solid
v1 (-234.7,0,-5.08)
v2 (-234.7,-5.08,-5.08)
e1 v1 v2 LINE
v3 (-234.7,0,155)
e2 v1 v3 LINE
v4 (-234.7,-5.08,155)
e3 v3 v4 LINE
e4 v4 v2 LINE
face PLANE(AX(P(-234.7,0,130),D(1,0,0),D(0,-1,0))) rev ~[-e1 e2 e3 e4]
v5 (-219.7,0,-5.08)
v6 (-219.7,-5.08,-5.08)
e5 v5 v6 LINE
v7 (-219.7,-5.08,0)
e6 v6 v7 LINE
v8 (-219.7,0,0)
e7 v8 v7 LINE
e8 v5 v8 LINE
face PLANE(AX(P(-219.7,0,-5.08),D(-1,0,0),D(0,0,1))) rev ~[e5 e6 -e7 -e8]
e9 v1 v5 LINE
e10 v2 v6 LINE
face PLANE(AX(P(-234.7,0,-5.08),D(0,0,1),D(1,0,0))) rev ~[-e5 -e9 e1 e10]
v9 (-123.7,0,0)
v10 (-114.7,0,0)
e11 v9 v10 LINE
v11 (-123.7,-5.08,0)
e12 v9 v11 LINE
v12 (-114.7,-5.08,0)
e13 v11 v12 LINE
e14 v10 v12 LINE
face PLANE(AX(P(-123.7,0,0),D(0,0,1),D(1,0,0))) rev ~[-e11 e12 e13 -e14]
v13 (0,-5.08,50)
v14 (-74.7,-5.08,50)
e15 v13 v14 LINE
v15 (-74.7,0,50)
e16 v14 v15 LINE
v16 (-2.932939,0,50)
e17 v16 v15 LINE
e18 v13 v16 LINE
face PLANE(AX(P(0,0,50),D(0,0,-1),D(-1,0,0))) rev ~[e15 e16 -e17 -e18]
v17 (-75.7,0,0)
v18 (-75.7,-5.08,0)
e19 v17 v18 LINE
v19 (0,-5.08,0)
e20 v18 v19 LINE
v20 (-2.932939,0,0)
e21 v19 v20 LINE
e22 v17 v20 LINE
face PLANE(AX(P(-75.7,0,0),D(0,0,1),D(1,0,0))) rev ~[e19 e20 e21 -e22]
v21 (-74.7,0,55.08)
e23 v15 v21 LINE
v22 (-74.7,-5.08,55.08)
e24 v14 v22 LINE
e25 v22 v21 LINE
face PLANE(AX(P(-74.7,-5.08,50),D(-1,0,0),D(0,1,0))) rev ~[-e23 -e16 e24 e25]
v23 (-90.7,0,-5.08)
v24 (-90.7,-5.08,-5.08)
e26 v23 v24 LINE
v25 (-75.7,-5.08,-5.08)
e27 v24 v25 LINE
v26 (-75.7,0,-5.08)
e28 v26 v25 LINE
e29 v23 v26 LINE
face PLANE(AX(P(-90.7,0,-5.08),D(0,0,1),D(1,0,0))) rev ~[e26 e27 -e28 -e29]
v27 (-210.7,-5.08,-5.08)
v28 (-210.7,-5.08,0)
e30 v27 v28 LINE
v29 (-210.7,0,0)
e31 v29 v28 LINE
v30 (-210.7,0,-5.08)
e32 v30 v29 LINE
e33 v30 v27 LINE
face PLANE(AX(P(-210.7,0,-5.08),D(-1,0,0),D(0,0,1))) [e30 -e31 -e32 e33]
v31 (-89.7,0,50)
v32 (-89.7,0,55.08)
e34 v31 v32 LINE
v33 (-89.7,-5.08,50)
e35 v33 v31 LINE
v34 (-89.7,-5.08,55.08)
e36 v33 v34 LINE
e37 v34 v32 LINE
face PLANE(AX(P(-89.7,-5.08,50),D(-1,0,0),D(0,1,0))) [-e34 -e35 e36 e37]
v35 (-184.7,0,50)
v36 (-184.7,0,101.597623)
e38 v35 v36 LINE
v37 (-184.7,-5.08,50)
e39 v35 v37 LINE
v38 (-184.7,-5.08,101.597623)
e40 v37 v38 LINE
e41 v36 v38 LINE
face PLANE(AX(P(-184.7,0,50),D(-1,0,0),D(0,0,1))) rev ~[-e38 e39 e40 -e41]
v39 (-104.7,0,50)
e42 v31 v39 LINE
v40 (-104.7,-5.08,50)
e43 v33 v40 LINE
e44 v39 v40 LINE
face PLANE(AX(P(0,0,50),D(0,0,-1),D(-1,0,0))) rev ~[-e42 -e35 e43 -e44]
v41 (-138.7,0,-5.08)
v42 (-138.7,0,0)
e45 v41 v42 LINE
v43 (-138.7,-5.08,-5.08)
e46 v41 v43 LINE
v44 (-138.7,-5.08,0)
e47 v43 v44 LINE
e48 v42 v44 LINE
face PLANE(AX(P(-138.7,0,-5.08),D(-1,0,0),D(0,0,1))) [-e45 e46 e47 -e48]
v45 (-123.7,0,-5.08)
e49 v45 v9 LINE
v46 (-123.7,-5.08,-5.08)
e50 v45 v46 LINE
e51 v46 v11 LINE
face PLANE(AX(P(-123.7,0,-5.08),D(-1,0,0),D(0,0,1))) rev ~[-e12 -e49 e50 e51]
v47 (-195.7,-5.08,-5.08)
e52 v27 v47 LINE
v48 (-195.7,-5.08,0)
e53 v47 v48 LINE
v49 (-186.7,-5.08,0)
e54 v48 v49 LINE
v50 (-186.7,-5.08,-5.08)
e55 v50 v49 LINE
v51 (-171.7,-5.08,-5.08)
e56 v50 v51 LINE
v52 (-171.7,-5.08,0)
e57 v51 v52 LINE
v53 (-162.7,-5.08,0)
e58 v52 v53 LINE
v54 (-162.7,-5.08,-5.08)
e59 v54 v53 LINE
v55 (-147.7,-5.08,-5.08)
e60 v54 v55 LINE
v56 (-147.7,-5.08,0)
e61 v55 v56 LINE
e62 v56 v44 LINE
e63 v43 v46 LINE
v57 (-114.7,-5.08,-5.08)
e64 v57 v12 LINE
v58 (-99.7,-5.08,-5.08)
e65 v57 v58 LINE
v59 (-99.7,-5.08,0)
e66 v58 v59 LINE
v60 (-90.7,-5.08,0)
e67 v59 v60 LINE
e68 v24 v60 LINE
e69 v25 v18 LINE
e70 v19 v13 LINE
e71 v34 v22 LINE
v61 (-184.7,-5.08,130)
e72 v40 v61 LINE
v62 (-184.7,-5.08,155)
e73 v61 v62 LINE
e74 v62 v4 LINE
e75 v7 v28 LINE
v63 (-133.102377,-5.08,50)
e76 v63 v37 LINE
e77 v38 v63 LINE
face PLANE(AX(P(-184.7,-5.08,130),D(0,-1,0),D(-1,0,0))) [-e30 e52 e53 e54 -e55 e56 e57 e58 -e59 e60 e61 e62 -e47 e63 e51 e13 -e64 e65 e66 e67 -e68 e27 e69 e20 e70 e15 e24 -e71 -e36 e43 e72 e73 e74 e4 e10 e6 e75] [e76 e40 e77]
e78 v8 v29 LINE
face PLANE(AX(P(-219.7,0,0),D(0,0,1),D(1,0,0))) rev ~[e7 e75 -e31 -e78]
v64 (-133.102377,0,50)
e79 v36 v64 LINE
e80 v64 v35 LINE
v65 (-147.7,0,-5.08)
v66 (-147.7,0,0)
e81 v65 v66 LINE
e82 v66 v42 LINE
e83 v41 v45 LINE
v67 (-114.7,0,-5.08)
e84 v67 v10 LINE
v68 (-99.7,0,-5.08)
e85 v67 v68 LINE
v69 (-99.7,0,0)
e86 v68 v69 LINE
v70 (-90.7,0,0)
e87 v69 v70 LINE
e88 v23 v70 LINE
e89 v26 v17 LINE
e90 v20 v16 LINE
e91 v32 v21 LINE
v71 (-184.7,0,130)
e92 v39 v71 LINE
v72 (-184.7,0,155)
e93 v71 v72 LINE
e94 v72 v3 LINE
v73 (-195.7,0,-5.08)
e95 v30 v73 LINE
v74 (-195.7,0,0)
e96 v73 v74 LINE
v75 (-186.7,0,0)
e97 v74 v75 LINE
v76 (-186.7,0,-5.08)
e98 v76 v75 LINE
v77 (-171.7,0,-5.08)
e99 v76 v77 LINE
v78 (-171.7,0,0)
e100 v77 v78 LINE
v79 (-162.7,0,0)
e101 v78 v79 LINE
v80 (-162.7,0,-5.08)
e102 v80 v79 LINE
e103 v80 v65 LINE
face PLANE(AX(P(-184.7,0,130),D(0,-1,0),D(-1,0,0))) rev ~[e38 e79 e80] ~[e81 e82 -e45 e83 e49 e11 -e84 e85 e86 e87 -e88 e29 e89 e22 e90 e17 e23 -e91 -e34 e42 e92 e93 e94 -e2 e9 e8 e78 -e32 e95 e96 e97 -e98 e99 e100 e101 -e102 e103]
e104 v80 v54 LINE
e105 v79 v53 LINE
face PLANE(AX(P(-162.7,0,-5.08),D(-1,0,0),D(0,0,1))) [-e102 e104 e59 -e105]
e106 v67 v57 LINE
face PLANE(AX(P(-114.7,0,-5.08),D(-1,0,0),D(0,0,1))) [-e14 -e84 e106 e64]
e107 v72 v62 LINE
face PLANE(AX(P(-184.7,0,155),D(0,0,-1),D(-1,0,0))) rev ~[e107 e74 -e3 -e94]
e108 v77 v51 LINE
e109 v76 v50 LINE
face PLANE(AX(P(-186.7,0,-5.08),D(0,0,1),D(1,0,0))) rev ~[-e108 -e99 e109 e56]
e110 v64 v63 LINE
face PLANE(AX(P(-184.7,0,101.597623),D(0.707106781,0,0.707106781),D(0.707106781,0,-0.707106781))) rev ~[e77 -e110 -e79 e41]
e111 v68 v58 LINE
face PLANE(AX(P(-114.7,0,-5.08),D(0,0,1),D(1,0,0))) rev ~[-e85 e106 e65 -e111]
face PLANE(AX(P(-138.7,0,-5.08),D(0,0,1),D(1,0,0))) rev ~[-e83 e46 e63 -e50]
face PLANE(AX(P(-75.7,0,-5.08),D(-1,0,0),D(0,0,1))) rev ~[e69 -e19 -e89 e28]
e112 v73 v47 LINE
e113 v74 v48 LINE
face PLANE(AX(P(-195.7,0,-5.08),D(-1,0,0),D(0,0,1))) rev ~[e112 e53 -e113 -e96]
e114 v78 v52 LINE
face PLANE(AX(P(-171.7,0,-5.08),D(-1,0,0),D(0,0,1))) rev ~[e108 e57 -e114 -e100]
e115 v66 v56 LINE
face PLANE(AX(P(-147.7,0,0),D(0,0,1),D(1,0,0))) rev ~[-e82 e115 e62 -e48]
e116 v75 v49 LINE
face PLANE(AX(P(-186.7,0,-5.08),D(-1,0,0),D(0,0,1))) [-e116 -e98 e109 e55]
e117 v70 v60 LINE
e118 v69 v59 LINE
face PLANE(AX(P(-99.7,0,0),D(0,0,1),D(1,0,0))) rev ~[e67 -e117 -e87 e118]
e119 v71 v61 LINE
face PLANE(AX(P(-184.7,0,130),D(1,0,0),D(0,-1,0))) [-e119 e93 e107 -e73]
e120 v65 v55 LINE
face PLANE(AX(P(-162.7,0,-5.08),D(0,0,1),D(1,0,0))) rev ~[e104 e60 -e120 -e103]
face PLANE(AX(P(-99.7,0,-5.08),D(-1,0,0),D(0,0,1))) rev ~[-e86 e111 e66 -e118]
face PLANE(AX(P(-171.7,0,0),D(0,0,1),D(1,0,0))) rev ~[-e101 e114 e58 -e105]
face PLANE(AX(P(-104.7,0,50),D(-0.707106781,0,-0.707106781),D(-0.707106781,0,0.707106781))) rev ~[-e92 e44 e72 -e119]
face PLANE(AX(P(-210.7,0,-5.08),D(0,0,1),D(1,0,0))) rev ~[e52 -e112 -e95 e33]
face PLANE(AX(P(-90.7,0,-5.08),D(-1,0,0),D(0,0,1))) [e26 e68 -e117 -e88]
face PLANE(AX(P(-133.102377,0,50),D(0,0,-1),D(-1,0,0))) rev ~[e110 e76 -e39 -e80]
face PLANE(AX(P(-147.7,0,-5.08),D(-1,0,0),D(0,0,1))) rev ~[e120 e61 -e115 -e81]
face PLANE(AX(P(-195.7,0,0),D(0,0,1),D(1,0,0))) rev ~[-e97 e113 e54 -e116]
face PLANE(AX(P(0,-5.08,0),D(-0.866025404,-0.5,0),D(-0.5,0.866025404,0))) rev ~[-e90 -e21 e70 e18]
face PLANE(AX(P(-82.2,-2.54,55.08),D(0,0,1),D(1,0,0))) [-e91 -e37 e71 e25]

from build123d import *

# Parameters (mm, degrees)
F0_W     = 15
F0_H     = 5.08
F1_DEPTH = 5.08
F2_DEPTH = 25
F4_DEPTH = 50
F5_W     = 15
F5_H     = 5.08
F6_DEPTH = 5.08


# Not quite as in the source:
# - a feature names something its author has since deleted; it is built from what else it names


with BuildPart() as f1:
    # F0 (on Front) → F1 (new body)
    with BuildSketch(Plane.XZ):
        Polygon((-75.7, 0), (0, 0), (0, 50), (-104.7, 50), (-133.1023774395, 50), (-184.7, 50), (-184.7, 101.5976225605), (-184.7, 130), (-234.7, 130), (-234.7, 0), (-219.7, 0), (-210.7, 0), (-195.7, 0), (-186.7, 0), (-171.7, 0), (-162.7, 0), (-147.7, 0), (-138.7, 0), (-123.7, 0), (-114.7, 0), (-99.7, 0), (-90.7, 0), align=None)
        with Locations((-83.2, -2.54)):
            Rectangle(F0_W, F0_H)
        Polygon((-133.1023774395, 50), (-104.7, 50), (-184.7, 130), (-184.7, 101.5976225605), align=None)
        with Locations((-107.2, -2.54)):
            Rectangle(F0_W, F0_H)
        with Locations((-131.2, -2.54)):
            Rectangle(F0_W, F0_H)
        with Locations((-227.2, -2.54)):
            Rectangle(F0_W, F0_H)
        with Locations((-155.2, -2.54)):
            Rectangle(F0_W, F0_H)
        with Locations((-203.2, -2.54)):
            Rectangle(F0_W, F0_H)
        with Locations((-179.2, -2.54)):
            Rectangle(F0_W, F0_H)
    extrude(amount=F1_DEPTH)

    # F2 (add): a face of the model
    f2_faces = [f1.faces().sort_by_distance(p)[0] for p in [
        (-209.7, -2.54, 130),
    ]]
    extrude(f2_faces, amount=F2_DEPTH)

    # F3 (on face) → F4 (cut)
    with BuildSketch(Plane(origin=(0, 0, 0), x_dir=(1, 0, 0), z_dir=(0, 0, -1))):
        Polygon((0, 0), (0, 5.08), (-2.9329393675, 0), align=None)
    extrude(amount=-F4_DEPTH, mode=Mode.SUBTRACT)

    # F5 (on face) → F6 (join)
    with BuildSketch(Plane.XY.offset(50)):
        with Locations((-82.2, -2.54)):
            Rectangle(F5_W, F5_H)
    extrude(amount=F6_DEPTH)


solid = f1.part
